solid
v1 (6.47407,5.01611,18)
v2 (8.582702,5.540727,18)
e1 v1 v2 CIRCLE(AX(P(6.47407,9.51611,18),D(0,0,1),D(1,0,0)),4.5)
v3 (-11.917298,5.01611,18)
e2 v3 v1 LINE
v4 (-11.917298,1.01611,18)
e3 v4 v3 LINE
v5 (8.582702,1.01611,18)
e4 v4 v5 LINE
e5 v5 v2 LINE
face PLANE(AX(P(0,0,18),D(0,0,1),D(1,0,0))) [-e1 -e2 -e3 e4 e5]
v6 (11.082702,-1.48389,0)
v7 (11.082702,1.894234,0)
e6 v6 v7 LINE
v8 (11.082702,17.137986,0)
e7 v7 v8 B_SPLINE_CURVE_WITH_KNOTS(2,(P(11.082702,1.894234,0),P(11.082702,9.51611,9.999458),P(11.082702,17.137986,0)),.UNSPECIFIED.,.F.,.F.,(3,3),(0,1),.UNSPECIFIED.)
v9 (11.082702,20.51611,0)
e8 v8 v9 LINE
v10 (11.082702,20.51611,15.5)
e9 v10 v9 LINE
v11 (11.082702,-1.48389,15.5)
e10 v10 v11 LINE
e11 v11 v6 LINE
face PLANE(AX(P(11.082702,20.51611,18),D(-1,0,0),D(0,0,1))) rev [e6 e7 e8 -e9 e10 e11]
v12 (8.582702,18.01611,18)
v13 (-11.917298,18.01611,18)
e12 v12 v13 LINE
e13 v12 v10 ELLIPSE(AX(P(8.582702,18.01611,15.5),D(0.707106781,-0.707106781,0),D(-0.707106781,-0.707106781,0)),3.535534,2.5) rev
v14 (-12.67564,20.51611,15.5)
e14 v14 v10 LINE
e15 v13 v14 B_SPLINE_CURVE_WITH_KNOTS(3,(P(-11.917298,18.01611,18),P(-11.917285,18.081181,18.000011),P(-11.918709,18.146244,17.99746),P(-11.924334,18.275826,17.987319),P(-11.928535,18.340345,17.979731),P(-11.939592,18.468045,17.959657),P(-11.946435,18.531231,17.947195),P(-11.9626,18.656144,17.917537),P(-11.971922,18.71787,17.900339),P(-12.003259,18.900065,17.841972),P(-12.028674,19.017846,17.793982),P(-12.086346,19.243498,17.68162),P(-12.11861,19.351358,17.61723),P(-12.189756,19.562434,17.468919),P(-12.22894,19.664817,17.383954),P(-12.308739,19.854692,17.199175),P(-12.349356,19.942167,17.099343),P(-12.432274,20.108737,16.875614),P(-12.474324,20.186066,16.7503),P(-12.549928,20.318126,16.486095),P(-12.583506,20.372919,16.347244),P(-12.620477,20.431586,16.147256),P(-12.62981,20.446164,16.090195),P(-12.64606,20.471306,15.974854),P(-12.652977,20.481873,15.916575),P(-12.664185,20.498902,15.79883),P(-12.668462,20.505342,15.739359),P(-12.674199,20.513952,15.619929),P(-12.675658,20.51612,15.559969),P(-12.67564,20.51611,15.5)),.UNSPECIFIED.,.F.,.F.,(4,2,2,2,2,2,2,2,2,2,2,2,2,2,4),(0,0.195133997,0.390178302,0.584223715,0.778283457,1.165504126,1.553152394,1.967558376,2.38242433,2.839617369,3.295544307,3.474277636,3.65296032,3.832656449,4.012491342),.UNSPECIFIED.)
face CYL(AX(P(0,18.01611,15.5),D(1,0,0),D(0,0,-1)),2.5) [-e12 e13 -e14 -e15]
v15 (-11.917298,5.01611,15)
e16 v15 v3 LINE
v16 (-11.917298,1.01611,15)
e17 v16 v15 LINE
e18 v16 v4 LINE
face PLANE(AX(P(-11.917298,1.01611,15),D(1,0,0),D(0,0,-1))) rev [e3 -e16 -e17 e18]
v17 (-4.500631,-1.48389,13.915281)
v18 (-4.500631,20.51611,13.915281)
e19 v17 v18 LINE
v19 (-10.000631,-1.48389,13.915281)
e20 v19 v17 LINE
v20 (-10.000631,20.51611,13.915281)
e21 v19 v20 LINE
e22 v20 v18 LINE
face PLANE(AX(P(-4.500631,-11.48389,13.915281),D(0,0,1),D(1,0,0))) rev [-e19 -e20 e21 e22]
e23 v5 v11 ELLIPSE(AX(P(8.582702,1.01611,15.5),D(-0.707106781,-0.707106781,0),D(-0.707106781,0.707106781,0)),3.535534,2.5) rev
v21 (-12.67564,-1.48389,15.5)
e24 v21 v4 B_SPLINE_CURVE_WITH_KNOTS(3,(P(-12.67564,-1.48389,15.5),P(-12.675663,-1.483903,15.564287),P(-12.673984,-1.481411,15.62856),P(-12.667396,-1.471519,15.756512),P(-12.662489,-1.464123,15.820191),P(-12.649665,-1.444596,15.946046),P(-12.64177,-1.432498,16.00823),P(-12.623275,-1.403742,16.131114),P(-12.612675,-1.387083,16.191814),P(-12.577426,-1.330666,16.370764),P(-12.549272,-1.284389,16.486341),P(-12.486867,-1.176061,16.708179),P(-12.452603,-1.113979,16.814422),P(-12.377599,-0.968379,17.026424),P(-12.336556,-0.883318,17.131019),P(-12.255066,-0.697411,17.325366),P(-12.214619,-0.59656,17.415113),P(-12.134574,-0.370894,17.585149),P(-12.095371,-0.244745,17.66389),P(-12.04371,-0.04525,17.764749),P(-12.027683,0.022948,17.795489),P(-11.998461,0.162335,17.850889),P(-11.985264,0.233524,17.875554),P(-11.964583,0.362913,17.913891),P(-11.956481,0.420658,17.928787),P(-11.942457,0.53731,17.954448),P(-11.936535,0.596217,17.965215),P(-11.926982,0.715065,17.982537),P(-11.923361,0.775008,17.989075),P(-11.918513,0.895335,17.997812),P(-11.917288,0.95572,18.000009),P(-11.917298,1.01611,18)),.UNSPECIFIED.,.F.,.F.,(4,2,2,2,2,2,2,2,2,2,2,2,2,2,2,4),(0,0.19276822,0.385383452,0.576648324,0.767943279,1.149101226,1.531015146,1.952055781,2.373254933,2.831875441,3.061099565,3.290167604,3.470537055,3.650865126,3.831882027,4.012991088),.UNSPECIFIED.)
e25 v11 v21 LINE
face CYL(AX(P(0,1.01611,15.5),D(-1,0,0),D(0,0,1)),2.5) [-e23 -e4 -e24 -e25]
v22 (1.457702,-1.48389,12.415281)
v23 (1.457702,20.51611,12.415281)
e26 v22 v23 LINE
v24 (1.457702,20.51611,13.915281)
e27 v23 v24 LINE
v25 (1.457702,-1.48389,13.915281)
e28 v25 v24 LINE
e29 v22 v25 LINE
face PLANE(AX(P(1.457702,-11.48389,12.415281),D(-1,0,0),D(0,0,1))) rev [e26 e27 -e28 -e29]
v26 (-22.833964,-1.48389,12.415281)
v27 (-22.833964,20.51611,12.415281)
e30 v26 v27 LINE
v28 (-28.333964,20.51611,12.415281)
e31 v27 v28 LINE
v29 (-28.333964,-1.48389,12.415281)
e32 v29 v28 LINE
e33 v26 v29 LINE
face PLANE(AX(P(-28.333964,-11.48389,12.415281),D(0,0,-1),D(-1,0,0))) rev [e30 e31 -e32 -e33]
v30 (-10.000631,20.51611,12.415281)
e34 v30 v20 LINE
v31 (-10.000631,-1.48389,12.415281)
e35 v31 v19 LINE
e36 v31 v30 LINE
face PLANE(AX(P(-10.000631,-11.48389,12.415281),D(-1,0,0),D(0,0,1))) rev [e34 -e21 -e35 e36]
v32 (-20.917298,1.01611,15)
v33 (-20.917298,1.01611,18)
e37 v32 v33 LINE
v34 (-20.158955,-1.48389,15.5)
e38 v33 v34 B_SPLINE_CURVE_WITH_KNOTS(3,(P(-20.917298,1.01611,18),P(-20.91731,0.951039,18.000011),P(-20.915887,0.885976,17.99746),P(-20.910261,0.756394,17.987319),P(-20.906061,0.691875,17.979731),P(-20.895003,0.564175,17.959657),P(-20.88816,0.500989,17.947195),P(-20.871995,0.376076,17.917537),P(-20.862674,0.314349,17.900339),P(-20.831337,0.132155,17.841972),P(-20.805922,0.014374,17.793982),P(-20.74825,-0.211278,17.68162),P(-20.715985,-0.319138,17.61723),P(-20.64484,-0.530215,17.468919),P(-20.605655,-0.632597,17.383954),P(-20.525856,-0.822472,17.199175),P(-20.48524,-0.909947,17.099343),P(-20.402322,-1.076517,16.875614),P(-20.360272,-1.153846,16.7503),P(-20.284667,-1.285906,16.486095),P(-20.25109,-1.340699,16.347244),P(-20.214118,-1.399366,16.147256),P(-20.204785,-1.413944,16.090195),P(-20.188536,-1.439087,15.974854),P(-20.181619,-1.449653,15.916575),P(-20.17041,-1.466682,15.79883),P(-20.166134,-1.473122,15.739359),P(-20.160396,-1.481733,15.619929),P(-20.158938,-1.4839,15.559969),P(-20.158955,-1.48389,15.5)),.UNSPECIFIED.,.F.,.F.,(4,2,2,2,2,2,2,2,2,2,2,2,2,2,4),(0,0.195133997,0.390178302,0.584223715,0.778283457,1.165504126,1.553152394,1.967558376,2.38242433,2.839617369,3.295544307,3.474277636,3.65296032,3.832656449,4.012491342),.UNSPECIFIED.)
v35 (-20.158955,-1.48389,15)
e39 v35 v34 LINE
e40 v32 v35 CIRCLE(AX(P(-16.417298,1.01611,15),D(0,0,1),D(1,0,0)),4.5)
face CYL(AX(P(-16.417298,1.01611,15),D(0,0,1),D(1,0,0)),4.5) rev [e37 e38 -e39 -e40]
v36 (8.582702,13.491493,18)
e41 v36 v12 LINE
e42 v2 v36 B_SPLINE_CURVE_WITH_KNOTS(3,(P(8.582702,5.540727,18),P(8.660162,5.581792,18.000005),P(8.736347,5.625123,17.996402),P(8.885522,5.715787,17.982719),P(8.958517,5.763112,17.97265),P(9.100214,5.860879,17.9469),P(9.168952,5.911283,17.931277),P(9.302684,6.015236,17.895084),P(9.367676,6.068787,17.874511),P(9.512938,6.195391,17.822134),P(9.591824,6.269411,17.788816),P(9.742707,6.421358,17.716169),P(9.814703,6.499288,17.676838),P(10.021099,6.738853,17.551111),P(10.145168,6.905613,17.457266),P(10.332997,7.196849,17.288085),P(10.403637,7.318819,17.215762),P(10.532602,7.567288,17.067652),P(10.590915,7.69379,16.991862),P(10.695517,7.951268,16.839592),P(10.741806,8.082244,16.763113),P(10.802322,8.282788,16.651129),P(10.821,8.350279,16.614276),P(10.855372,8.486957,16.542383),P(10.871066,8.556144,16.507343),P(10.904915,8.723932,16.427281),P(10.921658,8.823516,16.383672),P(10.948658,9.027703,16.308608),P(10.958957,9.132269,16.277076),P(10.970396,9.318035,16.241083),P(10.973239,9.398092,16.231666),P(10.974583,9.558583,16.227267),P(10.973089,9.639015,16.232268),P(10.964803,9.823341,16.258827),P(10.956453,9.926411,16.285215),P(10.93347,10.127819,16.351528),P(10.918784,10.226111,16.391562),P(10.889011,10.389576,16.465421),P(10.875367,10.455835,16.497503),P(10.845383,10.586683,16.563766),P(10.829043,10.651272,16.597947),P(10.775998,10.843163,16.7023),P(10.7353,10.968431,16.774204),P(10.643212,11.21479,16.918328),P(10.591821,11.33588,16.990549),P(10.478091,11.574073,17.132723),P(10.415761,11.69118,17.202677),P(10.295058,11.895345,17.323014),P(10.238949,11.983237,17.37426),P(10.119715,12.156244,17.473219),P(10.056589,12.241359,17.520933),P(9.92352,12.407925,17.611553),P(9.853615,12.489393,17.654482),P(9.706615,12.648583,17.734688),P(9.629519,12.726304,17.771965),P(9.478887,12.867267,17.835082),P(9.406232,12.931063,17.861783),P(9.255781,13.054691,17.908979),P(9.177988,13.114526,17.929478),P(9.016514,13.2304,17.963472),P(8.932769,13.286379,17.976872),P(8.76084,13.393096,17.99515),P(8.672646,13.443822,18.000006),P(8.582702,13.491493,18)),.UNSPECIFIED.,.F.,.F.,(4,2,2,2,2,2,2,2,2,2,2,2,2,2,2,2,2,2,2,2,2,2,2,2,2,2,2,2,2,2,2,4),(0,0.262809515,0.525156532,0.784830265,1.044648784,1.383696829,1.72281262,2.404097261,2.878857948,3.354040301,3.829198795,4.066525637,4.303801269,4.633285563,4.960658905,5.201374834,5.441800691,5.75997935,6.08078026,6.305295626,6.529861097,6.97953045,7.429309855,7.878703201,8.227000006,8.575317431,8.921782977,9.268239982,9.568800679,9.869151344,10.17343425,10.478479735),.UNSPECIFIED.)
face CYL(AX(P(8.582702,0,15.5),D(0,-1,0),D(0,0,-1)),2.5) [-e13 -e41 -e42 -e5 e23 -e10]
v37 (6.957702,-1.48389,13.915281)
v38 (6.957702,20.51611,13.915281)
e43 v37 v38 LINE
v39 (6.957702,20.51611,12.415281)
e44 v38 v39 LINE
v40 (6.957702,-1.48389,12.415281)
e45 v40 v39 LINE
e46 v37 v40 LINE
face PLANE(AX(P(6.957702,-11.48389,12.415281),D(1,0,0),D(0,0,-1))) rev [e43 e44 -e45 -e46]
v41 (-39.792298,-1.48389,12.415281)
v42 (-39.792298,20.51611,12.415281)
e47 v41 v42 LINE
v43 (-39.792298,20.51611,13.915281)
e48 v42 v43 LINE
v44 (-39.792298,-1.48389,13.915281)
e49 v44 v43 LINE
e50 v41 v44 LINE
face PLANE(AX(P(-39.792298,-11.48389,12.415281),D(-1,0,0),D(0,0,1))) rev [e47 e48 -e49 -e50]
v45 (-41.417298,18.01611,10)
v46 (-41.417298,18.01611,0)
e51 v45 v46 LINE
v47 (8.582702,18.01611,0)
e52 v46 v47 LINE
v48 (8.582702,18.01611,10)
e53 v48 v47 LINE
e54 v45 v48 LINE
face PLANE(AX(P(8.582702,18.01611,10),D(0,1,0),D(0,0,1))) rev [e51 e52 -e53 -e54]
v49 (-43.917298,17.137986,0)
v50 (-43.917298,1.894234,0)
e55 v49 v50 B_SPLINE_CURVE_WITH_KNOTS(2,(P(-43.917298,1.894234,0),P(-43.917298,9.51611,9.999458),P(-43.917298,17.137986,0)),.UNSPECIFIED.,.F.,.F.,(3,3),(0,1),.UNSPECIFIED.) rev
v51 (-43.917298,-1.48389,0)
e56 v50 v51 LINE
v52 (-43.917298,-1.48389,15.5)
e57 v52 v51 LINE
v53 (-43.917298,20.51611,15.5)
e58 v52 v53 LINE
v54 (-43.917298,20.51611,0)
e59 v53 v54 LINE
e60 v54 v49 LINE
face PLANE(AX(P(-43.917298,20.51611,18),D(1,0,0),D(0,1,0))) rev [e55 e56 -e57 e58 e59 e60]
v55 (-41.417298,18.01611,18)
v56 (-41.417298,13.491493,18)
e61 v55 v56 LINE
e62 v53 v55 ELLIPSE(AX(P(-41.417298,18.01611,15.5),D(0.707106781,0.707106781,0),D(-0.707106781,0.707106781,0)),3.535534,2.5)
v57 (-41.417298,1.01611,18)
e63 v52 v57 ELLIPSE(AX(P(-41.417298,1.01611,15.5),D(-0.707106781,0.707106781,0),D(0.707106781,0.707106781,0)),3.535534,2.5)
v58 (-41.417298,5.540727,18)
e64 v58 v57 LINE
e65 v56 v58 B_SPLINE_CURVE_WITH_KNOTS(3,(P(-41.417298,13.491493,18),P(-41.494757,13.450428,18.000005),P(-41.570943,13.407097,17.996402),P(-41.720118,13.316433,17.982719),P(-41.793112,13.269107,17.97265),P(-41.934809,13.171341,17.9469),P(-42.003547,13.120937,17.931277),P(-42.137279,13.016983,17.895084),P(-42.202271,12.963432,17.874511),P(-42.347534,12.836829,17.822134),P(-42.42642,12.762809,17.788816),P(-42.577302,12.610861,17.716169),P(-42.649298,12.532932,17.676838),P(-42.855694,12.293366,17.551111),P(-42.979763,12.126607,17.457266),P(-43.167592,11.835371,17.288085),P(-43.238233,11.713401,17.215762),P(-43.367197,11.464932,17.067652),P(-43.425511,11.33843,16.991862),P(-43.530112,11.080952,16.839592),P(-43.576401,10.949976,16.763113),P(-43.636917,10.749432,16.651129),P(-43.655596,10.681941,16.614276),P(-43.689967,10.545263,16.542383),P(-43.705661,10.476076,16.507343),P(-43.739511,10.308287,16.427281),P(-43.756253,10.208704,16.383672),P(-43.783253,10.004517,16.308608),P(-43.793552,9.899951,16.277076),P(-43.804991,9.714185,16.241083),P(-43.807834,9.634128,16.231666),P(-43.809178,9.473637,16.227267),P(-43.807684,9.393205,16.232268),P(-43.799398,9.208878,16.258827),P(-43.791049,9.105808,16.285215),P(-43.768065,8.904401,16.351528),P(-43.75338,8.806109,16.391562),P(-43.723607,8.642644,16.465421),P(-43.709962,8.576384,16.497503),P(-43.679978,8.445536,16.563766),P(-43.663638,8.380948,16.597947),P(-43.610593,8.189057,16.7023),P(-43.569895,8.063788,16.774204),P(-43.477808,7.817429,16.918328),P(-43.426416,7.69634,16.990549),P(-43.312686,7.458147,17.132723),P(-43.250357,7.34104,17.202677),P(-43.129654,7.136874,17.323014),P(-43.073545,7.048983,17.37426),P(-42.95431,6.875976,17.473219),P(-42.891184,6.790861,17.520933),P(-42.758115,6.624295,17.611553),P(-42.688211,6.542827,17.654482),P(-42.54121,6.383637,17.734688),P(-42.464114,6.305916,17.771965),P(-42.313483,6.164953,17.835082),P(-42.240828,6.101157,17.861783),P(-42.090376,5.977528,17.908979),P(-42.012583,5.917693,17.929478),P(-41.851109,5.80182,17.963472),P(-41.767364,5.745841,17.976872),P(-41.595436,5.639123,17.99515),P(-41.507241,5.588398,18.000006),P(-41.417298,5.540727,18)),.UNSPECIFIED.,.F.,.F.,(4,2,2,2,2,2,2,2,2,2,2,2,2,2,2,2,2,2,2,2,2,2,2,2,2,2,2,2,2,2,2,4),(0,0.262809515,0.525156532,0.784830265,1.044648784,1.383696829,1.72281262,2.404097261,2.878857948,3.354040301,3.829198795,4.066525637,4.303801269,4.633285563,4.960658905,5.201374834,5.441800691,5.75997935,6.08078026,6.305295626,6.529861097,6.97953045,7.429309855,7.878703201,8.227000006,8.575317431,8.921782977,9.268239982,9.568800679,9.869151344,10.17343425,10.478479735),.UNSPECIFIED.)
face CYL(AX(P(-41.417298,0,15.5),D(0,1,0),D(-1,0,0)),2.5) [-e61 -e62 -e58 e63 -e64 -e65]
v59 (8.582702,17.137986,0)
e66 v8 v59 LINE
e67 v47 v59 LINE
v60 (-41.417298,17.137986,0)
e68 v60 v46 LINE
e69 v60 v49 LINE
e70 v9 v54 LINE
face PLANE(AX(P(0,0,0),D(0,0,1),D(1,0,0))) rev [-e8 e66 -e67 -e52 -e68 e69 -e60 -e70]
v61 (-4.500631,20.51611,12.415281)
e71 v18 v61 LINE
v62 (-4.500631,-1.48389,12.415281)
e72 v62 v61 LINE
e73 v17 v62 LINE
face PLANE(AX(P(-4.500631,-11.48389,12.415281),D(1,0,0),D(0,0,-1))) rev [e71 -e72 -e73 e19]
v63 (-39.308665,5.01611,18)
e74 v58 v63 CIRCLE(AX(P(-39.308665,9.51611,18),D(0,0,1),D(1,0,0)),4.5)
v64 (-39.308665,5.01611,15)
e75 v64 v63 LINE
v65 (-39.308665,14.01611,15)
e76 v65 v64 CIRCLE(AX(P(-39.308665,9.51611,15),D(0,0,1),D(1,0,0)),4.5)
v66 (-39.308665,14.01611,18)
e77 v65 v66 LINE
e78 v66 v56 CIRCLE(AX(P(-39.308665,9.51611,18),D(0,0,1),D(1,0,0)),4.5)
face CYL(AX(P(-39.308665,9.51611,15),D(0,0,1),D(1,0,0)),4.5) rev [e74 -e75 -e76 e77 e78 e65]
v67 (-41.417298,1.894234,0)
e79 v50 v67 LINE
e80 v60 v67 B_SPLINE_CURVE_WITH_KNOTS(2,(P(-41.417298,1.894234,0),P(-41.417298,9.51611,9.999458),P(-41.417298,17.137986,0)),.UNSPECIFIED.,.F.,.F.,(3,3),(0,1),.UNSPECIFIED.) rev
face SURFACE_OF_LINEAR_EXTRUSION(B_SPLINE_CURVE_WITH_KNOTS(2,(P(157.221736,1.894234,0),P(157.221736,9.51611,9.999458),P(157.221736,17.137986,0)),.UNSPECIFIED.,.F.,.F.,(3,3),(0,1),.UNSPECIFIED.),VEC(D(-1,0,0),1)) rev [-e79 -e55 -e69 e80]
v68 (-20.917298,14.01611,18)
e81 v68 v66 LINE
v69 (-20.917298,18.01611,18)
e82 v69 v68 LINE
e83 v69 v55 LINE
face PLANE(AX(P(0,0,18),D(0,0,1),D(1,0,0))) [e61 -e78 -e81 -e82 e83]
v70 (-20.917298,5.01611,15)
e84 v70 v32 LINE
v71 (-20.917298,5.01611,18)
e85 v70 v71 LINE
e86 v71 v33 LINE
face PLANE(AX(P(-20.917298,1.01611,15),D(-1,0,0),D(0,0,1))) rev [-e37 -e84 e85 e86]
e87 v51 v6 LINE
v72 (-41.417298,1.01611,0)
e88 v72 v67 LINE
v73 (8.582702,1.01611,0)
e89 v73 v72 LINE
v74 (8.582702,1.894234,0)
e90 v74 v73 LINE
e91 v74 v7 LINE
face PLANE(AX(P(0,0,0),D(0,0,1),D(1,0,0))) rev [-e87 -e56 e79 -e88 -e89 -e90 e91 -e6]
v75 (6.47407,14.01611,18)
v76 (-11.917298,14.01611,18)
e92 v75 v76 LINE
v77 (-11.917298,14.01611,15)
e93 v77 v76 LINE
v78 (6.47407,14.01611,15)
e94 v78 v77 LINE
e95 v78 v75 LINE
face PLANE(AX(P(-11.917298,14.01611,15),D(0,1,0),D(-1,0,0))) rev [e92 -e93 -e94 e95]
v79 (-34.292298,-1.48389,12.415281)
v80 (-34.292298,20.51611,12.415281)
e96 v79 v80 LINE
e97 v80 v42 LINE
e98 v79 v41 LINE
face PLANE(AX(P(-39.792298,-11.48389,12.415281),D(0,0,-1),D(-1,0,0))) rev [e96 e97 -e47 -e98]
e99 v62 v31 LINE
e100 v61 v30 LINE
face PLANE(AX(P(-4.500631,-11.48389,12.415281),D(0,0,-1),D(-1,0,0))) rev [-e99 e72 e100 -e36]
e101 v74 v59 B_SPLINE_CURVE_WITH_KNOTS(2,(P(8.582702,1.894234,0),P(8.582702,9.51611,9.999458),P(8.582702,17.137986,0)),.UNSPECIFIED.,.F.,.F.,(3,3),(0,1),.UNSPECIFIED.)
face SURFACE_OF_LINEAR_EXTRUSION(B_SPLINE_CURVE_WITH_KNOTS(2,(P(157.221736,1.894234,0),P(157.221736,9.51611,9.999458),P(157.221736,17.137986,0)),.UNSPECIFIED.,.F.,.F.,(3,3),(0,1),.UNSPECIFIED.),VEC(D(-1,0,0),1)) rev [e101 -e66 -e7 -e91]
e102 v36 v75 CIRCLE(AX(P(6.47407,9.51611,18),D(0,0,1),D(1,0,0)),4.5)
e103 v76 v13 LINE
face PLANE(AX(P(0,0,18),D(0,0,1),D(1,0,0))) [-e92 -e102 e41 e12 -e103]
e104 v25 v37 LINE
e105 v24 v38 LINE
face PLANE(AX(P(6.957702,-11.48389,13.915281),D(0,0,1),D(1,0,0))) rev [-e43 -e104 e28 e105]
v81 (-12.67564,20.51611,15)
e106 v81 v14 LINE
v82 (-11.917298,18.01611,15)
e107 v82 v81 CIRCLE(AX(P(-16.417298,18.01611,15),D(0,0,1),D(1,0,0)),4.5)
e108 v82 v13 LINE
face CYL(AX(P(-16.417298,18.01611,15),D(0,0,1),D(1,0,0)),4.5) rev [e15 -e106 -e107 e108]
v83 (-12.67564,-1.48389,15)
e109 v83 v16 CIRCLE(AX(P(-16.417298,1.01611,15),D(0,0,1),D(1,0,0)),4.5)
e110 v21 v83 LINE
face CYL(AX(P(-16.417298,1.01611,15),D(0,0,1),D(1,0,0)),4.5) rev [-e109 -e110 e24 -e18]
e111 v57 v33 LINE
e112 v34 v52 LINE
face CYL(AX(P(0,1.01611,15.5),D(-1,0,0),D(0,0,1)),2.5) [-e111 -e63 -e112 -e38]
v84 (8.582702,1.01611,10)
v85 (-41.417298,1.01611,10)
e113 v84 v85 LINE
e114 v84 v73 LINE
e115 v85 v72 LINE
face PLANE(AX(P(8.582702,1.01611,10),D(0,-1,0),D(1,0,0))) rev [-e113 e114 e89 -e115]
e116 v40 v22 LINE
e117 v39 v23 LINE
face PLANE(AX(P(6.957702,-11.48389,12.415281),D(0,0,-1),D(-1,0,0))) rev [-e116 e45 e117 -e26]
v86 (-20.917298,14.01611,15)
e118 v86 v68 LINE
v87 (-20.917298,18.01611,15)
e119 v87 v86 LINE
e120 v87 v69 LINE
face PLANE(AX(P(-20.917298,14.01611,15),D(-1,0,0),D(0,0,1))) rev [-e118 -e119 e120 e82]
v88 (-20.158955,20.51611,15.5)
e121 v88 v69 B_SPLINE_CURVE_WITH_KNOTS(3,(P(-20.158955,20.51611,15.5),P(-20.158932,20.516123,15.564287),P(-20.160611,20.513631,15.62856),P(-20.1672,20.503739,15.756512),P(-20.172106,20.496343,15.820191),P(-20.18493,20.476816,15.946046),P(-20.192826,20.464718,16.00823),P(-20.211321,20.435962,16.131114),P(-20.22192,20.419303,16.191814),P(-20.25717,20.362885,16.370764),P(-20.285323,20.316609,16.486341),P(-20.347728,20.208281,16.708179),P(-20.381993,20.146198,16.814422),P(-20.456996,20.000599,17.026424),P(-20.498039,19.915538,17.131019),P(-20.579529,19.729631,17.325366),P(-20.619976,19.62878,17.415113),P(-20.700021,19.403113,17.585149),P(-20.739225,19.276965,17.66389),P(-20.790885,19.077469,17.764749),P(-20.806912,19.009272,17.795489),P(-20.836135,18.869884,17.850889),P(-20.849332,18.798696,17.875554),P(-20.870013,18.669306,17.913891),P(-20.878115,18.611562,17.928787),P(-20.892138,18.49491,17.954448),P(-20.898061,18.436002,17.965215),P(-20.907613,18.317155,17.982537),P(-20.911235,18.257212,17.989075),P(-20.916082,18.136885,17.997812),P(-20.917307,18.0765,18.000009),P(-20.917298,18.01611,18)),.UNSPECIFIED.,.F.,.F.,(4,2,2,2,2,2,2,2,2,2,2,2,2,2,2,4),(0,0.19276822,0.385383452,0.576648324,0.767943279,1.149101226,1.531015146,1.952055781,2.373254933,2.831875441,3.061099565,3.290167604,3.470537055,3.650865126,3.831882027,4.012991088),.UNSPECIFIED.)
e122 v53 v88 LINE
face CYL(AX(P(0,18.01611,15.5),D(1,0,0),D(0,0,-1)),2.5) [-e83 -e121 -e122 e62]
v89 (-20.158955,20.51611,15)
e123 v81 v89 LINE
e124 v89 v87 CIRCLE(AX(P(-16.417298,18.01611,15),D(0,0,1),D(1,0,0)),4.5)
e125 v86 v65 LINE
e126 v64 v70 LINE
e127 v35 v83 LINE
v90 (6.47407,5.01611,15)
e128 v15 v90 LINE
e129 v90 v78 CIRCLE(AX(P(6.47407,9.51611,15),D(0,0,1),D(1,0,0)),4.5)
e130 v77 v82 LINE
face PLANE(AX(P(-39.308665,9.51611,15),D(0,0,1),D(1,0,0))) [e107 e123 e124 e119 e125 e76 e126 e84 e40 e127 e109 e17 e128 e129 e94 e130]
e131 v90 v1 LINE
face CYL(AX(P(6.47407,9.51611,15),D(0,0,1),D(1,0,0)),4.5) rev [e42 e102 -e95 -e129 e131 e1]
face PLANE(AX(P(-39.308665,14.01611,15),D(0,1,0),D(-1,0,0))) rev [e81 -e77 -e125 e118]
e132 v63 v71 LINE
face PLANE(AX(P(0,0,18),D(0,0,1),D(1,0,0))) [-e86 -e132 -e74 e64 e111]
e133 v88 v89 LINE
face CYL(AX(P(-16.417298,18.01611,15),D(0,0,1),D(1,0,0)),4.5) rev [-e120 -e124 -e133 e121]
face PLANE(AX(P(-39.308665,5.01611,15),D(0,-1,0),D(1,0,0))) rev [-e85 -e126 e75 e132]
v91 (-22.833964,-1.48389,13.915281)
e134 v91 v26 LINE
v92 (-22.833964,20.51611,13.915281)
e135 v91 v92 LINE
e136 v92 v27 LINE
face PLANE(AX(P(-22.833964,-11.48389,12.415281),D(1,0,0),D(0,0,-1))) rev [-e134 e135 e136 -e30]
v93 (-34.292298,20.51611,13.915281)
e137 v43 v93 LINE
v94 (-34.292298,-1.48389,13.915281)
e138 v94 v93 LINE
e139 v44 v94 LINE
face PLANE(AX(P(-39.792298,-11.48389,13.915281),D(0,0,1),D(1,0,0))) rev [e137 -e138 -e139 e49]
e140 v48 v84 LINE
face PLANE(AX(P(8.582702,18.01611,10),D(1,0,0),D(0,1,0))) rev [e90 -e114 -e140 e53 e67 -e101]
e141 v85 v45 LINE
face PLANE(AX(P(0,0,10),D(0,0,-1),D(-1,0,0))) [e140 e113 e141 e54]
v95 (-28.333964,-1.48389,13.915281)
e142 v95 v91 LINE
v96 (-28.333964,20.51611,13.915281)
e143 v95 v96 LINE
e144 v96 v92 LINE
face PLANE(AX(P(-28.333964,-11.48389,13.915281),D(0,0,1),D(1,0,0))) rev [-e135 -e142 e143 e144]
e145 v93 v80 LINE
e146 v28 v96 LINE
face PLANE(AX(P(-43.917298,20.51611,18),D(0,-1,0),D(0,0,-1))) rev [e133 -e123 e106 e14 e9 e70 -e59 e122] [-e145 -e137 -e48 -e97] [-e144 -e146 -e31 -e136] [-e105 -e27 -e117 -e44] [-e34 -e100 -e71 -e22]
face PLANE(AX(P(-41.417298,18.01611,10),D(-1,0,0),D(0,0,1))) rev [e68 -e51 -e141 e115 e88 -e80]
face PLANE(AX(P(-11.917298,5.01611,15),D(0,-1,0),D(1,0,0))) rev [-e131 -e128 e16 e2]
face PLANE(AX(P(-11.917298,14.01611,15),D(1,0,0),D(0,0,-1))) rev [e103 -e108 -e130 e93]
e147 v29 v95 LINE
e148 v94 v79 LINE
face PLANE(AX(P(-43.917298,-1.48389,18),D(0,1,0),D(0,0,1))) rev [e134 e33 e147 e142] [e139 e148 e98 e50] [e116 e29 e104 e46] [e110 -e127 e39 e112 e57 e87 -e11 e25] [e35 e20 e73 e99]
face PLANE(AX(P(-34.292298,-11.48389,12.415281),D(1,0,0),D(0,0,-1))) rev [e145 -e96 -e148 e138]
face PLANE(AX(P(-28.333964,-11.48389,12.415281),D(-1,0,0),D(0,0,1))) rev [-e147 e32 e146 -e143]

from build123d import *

# Parameters (mm, degrees)
SKETCH1_W           = 55
SKETCH1_H           = 22
BOSS_EXTRUDE1_DEPTH = 18
CUT_EXTRUDE2_START  = -55
CUT_EXTRUDE2_DEPTH  = 55
SKETCH5_W           = 50
SKETCH5_H           = 17
CUT_EXTRUDE3_DEPTH  = 10
FILLET1_R           = 2.5
CUT_EXTRUDE4_DEPTH  = 3
SKETCH8_W           = 5.5
SKETCH8_H           = 1.5
CUT_EXTRUDE5_DEPTH  = 32


# Read off the part's stored shape, not the designer's step: Cut-Extrude2
with BuildPart() as part:
    # Sketch1 → Boss-Extrude1 (new body)
    with BuildSketch(Plane.XY):
        with Locations((-16.417297699, 9.516109874)):
            Rectangle(SKETCH1_W, SKETCH1_H)
    extrude(amount=BOSS_EXTRUDE1_DEPTH)

    # Cut-Extrude2 outline → Cut-Extrude2 (cut)
    with BuildSketch(Plane(origin=(11.082702301, 0, 0), x_dir=(0, 0, -1), z_dir=(1, 0, 0)).offset(CUT_EXTRUDE2_START)):
        with BuildLine():
            add(Edge.make_bspline(
                [(0, 1.8942341), (-9.999457611, 9.516109874), (0, 17.137985647)],
                knots=[0, 0, 0, 1, 1, 1], degree=2))
            Line((0, 1.8942341), (0, 17.137985647))
        make_face()
    extrude(amount=CUT_EXTRUDE2_DEPTH, mode=Mode.SUBTRACT)

    # Sketch5 → Cut-Extrude3 (cut)
    with BuildSketch(Plane(origin=(0, 0, 0), x_dir=(-1, 0, 0), z_dir=(0, 0, -1))):
        with Locations((16.417297699, 9.516109874)):
            Rectangle(SKETCH5_W, SKETCH5_H)
    extrude(amount=-CUT_EXTRUDE3_DEPTH, mode=Mode.SUBTRACT)

    # Fillet1
    fillet1_edges = [part.edges().sort_by_distance(p)[0] for p in [
        (11.082702301, 9.516109874, 18),
        (-16.417297699, 20.516109874, 18),
        (-43.917297699, 9.516109874, 18),
        (-16.417297699, -1.483890126, 18),
    ]]
    fillet(fillet1_edges, radius=FILLET1_R)

    # Sketch7 → Cut-Extrude4 (cut)
    with BuildSketch(Plane.XY.offset(18)):
        with BuildLine():
            Line((-39.308664902, 14.016109874), (-20.917297699, 14.016109874))
            Line((-20.917297699, 14.016109874), (-20.917297699, 18.016109874))
            ThreePointArc((-20.917297699, 18.016109874), (-16.417297699, 22.516109874), (-11.917297699, 18.016109874))
            Line((-11.917297699, 18.016109874), (-11.917297699, 14.016109874))
            Line((-11.917297699, 14.016109874), (6.474069505, 14.016109874))
            ThreePointArc((6.474069505, 14.016109874), (10.974069505, 9.516109874), (6.474069505, 5.016109874))
            Line((6.474069505, 5.016109874), (-11.917297699, 5.016109874))
            Line((-11.917297699, 5.016109874), (-11.917297699, 1.016109874))
            ThreePointArc((-11.917297699, 1.016109874), (-16.417297699, -3.483890126), (-20.917297699, 1.016109874))
            Line((-20.917297699, 1.016109874), (-20.917297699, 5.016109874))
            Line((-20.917297699, 5.016109874), (-39.308664902, 5.016109874))
            ThreePointArc((-39.308664902, 5.016109874), (-43.808664902, 9.516109874), (-39.308664902, 14.016109874))
        make_face()
    extrude(amount=-CUT_EXTRUDE4_DEPTH, mode=Mode.SUBTRACT)

    # Sketch8 → Cut-Extrude5 (cut)
    with BuildSketch(Plane(origin=(0, 20.516109874, 0), x_dir=(1, 0, 0), z_dir=(0, 1, 0))):
        with Locations((-37.042297699, -13.165280764)):
            Rectangle(SKETCH8_W, SKETCH8_H)
        with Locations((-7.250631032, -13.165280764)):
            Rectangle(SKETCH8_W, SKETCH8_H)
        with Locations((4.207702301, -13.165280764)):
            Rectangle(SKETCH8_W, SKETCH8_H)
        with Locations((-25.583964365, -13.165280764)):
            Rectangle(SKETCH8_W, SKETCH8_H)
    extrude(amount=-CUT_EXTRUDE5_DEPTH, mode=Mode.SUBTRACT)


solid = part.part
